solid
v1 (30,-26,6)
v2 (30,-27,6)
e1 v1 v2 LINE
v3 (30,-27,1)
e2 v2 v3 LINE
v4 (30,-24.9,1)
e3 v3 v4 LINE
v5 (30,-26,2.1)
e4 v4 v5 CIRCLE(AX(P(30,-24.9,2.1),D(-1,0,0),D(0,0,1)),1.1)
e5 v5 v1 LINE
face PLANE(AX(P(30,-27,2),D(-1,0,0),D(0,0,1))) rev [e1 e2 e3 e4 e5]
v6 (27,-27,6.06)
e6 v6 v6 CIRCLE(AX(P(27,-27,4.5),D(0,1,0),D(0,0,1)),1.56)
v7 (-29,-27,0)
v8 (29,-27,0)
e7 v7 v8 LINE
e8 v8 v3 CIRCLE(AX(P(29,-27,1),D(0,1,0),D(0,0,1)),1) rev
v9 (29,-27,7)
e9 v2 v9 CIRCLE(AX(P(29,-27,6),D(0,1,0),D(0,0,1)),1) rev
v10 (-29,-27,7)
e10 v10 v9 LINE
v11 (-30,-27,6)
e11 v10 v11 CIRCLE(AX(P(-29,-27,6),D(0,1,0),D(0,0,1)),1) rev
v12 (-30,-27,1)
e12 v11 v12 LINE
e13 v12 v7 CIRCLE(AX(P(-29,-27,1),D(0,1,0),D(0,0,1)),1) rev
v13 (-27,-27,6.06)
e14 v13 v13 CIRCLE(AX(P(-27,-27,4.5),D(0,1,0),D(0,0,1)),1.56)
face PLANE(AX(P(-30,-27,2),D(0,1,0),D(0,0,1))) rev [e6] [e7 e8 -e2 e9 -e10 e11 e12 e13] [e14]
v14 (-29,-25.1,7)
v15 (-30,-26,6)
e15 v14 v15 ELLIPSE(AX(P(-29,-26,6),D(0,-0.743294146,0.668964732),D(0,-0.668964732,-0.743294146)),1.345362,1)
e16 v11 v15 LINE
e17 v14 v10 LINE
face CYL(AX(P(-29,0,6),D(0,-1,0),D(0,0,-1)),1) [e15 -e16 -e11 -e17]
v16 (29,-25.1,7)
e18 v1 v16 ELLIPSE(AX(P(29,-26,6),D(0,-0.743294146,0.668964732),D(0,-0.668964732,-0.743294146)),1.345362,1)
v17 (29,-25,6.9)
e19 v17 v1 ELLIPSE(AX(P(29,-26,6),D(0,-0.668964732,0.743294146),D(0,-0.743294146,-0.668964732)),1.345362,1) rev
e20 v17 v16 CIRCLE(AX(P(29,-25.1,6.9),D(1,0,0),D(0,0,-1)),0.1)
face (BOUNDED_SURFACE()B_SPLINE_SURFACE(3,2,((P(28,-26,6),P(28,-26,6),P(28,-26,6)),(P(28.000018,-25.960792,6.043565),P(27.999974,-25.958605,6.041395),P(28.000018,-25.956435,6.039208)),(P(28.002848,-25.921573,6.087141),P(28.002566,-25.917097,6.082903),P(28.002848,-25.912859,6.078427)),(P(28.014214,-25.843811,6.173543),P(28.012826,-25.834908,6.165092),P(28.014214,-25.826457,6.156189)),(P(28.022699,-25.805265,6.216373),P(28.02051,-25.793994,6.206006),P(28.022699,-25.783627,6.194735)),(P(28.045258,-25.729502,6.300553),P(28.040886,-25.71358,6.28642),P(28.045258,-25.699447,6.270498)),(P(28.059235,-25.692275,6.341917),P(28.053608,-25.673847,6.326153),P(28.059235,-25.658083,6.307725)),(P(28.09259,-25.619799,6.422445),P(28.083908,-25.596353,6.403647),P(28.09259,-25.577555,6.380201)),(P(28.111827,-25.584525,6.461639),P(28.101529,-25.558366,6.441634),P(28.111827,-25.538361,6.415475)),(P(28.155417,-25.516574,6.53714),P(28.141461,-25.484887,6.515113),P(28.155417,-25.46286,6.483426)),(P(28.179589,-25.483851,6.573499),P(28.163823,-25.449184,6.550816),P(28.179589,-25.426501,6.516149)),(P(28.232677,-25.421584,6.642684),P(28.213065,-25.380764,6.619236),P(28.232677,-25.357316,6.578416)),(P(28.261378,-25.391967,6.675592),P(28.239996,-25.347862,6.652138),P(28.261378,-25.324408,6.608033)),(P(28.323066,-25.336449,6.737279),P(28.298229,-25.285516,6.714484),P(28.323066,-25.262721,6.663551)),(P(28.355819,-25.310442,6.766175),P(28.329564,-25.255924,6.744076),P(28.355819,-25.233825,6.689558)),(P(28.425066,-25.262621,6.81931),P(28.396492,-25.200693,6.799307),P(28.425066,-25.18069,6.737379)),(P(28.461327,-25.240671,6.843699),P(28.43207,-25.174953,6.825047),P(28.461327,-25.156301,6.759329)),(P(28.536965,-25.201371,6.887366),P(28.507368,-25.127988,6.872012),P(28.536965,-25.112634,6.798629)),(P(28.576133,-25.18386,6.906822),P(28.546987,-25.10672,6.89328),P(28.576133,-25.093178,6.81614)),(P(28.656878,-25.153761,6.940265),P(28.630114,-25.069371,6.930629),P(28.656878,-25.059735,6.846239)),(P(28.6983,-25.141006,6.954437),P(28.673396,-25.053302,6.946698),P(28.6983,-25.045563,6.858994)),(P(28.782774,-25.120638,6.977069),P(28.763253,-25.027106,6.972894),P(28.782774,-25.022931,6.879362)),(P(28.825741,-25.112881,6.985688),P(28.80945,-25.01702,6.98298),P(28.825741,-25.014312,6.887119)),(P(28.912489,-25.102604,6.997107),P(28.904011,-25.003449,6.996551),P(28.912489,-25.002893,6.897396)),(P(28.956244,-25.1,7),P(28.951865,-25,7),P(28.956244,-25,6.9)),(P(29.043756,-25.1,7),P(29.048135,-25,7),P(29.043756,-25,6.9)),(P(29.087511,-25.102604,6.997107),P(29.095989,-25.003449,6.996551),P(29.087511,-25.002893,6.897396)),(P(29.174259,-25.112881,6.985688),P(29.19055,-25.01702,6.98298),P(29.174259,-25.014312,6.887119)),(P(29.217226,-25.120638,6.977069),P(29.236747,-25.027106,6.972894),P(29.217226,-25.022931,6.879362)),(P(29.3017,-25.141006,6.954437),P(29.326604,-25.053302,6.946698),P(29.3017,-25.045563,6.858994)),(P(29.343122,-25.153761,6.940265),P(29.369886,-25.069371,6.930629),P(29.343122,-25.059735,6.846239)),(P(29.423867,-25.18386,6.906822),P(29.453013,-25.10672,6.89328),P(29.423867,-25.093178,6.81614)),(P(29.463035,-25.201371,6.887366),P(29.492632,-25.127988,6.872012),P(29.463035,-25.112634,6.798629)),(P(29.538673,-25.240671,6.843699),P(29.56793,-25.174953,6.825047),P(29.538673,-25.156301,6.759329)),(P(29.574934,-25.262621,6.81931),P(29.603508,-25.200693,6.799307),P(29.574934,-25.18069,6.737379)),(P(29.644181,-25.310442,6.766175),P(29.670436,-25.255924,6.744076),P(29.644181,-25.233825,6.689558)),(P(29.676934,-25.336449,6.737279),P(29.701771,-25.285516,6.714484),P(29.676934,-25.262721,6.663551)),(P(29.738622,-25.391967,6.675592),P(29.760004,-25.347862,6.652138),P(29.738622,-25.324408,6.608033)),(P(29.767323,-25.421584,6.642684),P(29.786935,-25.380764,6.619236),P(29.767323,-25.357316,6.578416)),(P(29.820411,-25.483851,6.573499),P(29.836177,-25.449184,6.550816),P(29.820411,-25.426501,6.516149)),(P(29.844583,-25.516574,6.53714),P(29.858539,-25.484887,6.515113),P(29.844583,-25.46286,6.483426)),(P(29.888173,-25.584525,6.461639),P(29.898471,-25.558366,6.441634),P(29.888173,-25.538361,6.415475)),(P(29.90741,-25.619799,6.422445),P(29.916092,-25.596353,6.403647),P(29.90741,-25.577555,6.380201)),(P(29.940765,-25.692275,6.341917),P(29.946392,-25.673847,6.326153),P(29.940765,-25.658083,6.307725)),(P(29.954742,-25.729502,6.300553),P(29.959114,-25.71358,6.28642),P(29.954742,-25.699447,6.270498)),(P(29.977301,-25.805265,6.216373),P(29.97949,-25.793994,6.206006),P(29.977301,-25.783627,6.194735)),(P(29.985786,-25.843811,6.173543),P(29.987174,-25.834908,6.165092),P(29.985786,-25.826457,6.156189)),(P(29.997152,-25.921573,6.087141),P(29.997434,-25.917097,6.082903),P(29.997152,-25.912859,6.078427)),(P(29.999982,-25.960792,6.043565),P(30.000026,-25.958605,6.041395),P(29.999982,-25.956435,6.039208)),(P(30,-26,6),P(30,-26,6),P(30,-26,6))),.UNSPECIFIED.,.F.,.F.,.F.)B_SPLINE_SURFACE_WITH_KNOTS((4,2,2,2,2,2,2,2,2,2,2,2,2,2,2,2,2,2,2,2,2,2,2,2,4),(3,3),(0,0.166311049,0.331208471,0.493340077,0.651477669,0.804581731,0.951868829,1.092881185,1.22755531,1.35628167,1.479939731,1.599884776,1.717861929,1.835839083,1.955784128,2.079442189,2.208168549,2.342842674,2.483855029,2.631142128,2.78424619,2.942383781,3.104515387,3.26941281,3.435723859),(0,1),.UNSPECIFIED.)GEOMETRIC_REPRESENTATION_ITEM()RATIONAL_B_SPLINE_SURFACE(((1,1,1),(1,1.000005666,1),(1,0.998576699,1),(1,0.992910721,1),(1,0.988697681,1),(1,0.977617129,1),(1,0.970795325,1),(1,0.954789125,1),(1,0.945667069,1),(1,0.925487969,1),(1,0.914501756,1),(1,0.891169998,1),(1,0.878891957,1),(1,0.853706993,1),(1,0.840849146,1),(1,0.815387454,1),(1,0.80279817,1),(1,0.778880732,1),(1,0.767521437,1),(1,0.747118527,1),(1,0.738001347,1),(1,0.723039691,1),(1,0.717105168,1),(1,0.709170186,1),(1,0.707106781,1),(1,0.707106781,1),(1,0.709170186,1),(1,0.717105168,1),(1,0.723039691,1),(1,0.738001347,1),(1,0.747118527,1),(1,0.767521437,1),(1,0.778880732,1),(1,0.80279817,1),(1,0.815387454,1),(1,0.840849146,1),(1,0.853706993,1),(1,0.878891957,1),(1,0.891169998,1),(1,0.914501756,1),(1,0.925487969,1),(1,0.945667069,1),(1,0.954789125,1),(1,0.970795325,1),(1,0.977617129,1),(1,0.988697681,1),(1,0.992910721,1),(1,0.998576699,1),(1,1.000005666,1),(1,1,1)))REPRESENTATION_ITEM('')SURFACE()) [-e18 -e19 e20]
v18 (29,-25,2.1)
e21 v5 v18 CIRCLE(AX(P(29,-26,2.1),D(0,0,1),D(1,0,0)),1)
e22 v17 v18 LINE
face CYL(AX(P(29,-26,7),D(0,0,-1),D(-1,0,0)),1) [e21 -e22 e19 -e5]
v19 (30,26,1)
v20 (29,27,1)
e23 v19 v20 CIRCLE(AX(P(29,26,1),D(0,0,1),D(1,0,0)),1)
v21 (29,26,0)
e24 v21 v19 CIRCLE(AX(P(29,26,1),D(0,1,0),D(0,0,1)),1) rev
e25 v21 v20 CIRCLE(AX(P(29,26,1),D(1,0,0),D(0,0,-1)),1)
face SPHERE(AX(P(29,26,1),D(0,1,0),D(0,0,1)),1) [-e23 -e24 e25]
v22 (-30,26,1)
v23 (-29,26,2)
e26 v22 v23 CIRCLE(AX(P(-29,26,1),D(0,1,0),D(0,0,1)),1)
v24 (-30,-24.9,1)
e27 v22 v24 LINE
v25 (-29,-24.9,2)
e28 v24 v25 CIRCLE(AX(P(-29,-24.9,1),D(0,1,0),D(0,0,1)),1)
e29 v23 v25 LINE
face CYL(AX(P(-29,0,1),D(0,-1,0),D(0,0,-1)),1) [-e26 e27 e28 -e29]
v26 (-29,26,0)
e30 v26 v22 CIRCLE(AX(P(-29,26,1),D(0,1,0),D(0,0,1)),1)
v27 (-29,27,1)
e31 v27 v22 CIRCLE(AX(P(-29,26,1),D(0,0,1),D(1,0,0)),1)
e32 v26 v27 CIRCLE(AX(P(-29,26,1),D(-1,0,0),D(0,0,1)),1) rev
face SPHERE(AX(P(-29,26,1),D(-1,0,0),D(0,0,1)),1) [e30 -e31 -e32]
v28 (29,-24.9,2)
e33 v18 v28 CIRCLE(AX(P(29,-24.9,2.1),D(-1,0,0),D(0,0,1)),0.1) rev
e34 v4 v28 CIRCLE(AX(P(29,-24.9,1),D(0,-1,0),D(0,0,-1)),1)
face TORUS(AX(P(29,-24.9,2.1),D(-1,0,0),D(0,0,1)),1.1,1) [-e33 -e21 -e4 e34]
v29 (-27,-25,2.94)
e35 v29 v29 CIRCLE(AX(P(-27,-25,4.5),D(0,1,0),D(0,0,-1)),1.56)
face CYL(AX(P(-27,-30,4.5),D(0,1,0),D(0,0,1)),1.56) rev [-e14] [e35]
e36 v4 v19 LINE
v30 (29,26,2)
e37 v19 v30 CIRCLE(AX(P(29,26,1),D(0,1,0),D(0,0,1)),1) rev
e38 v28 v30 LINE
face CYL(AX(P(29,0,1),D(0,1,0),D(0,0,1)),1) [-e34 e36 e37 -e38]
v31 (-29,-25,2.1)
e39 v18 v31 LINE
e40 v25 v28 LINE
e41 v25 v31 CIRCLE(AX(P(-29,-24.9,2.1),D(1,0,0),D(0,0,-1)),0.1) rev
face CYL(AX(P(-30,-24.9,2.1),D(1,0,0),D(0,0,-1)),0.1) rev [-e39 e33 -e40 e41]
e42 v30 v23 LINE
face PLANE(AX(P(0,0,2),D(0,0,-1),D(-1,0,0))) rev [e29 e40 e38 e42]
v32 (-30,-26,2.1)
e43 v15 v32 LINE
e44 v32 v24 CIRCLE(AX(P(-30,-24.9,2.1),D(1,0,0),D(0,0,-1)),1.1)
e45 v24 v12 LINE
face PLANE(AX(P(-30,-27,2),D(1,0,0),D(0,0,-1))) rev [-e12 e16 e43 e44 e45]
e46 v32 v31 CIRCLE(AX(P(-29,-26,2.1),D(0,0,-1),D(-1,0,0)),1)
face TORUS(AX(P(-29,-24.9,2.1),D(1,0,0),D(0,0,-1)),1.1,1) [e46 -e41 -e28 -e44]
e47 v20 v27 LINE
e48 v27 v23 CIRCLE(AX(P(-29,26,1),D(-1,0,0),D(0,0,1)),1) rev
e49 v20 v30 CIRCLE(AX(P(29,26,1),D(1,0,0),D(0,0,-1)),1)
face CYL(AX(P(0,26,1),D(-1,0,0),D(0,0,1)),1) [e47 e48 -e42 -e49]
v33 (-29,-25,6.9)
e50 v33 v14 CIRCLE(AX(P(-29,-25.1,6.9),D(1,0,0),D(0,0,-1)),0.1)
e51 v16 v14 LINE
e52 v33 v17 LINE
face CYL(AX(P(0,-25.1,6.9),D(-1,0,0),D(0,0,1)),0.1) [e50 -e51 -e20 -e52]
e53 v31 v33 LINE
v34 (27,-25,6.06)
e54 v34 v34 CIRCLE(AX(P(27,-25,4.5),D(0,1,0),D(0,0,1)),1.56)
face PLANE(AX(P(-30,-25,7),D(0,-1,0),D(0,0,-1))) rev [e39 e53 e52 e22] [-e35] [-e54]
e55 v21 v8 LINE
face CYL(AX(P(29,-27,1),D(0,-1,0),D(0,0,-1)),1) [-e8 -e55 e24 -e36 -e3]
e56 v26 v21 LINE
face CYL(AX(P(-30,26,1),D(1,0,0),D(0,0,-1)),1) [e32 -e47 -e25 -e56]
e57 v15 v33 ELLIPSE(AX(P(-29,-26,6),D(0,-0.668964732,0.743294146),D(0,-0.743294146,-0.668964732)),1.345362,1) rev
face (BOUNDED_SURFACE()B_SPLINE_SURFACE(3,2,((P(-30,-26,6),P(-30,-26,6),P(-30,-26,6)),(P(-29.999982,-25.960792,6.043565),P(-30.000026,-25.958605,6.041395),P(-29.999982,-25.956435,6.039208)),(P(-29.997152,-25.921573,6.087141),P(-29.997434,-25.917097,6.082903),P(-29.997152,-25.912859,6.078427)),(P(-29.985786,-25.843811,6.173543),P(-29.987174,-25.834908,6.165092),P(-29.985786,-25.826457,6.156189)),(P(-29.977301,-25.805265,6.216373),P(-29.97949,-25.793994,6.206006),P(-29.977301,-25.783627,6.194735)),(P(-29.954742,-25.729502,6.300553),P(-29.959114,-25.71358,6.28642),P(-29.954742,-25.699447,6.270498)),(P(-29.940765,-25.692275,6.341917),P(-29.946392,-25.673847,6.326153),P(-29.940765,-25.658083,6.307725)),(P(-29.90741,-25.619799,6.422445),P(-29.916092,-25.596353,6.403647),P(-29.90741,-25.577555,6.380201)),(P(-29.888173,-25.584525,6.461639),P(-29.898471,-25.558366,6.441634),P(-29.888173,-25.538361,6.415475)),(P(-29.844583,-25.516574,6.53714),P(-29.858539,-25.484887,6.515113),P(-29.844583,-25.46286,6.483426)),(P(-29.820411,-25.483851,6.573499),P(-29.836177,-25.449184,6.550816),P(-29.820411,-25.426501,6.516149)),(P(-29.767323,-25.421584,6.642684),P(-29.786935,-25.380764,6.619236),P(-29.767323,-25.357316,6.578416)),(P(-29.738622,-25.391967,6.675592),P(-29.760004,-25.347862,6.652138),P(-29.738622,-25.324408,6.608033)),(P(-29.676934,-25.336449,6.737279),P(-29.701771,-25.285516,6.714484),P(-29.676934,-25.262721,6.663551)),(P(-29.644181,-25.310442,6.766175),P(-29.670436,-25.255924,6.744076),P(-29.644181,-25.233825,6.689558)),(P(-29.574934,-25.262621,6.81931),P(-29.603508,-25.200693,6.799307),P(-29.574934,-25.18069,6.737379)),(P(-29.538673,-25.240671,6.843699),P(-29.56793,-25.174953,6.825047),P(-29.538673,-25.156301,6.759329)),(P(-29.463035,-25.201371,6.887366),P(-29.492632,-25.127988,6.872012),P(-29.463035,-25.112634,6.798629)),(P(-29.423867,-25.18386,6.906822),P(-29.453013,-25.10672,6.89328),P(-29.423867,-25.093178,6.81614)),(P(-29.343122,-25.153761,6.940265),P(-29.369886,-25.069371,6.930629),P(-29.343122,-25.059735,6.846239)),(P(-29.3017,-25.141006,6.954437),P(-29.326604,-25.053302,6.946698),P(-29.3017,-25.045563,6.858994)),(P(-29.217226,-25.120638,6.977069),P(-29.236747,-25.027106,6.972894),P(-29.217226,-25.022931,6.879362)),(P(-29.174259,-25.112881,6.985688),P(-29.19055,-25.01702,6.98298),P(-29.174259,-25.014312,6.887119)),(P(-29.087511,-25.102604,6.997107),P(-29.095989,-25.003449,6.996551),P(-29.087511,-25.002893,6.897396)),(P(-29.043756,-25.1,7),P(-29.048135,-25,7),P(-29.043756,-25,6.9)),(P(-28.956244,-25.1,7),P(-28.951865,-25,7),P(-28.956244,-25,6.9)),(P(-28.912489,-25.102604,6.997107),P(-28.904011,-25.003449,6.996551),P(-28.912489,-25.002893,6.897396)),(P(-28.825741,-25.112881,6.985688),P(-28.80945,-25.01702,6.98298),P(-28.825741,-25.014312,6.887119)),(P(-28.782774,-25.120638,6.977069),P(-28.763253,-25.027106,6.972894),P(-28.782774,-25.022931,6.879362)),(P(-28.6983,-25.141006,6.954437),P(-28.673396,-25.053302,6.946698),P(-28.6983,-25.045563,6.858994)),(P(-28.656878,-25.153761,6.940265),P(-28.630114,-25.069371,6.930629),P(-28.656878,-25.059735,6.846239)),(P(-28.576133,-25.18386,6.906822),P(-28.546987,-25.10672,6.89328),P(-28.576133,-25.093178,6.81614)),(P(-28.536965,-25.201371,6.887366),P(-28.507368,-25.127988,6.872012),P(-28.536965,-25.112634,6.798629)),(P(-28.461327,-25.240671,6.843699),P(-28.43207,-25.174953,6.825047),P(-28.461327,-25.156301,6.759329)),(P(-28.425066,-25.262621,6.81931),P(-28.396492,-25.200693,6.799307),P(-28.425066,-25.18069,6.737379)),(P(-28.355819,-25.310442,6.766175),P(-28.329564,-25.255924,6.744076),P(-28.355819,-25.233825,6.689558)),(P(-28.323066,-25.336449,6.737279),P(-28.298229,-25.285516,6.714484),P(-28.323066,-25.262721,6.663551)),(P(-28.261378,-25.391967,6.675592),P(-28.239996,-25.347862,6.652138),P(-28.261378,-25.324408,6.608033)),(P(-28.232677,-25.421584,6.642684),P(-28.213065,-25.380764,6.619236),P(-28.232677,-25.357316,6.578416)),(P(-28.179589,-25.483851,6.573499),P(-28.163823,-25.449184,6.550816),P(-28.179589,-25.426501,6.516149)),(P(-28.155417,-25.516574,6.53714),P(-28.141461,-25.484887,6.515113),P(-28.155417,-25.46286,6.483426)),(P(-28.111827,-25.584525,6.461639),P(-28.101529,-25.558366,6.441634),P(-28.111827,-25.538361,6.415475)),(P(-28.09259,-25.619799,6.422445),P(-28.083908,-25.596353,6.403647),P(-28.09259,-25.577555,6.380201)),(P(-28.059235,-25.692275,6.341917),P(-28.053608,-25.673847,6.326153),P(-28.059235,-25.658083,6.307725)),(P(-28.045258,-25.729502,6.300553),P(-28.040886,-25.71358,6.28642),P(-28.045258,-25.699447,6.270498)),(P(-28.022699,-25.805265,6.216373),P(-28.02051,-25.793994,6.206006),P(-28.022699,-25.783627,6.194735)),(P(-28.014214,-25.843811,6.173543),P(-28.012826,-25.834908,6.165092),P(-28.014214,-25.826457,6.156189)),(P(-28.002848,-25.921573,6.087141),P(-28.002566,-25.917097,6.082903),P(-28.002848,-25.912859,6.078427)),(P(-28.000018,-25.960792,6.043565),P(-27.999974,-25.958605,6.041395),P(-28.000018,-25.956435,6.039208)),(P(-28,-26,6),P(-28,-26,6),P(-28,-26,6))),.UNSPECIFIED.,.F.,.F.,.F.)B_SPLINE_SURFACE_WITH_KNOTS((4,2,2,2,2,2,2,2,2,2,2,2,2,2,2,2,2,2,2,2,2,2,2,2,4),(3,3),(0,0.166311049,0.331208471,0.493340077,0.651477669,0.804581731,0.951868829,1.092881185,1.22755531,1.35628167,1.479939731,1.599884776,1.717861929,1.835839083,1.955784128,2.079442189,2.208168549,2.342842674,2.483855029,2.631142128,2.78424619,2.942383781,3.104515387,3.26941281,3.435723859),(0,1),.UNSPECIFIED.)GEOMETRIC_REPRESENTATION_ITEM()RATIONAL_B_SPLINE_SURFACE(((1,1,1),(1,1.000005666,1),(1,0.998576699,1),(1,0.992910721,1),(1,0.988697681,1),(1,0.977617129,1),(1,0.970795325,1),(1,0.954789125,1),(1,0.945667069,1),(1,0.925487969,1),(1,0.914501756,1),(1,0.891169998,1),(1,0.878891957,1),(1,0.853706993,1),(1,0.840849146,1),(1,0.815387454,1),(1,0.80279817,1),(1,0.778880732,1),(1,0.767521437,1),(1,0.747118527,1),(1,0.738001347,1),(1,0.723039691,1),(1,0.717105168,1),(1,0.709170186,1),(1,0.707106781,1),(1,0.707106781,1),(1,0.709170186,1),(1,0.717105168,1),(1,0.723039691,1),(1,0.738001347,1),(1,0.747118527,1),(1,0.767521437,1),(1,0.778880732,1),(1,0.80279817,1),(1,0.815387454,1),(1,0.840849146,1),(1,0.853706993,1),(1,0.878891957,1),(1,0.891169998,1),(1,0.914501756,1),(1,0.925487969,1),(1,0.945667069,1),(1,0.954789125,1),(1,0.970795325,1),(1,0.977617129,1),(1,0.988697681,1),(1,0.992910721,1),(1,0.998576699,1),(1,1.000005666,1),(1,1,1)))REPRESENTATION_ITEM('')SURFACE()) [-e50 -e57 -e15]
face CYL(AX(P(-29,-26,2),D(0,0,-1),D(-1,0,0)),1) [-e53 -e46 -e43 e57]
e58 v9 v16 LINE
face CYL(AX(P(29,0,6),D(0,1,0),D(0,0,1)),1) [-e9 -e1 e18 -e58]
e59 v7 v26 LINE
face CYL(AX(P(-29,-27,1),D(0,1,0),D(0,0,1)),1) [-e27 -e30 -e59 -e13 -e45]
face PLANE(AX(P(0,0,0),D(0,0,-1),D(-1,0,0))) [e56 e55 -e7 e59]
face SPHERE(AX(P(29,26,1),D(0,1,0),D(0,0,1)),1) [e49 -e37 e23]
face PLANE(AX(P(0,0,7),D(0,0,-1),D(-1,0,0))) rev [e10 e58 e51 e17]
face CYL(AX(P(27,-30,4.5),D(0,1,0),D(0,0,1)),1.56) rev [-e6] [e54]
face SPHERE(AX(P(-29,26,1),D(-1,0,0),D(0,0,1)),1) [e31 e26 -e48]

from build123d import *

# Parameters (mm, degrees)
SKETCH1_W           = 60
SKETCH1_H           = 54
BOSS_EXTRUDE1_DEPTH = 2
SKETCH2_W           = 60
SKETCH2_H           = 2
BOSS_EXTRUDE2_DEPTH = 5
SKETCH3_R           = 1.56
CUT_EXTRUDE1_DEPTH  = 5
FILLET1_R           = 0.1
FILLET2_R           = 1
FILLET3_R           = 0.1


with BuildPart() as part:
    # Sketch1 → Boss-Extrude1 (new body)
    with BuildSketch(Plane.XY):
        Rectangle(SKETCH1_W, SKETCH1_H)
    extrude(amount=BOSS_EXTRUDE1_DEPTH)

    # Sketch2 → Boss-Extrude2 (add)
    with BuildSketch(Plane.XY.offset(2)):
        with Locations((0, -26)):
            Rectangle(SKETCH2_W, SKETCH2_H)
    extrude(amount=BOSS_EXTRUDE2_DEPTH)

    # Sketch3 → Cut-Extrude1 (cut)
    with BuildSketch(Plane(origin=(0, -25, 0), x_dir=(1, 0, 0), z_dir=(0, 1, 0))):
        with Locations(Location((27, -4.5, 0), (0, 0, 270))):
            Circle(SKETCH3_R)
        with Locations(Location((-27, -4.5, 0), (0, 0, 270))):
            Circle(SKETCH3_R)
    extrude(amount=-CUT_EXTRUDE1_DEPTH, mode=Mode.SUBTRACT)

    # Fillet1
    fillet1_edges = [part.edges().sort_by_distance(p)[0] for p in [
        (0, -25, 2),
    ]]
    fillet(fillet1_edges, radius=FILLET1_R)

    # Fillet2
    fillet2_edges = [part.edges().sort_by_distance(p)[0] for p in [
        (-30, 1.05, 2),
        (-30, -25, 4.55),
        (30, -25, 4.55),
        (-30, -26, 7),
        (30, -26, 7),
        (30, 1.05, 2),
        (-30, -24.970710678, 2.029289322),
        (30, -24.970710678, 2.029289322),
        (-30, 0, 0),
        (0, 27, 0),
        (30, 0, 0),
        (-30, 27, 1),
        (30, 27, 1),
        (0, 27, 2),
    ]]
    fillet(fillet2_edges, radius=FILLET2_R - 0.0001)  # a hair under: the kernel refuses the full size

    # Fillet3
    fillet3_edges = [part.edges().sort_by_distance(p)[0] for p in [
        (0, -25, 7),
        (-29.763319687, -25.353915697, 6.646084303),
        (29.763319687, -25.353915697, 6.646084303),
    ]]
    fillet(fillet3_edges, radius=FILLET3_R)


solid = part.part
